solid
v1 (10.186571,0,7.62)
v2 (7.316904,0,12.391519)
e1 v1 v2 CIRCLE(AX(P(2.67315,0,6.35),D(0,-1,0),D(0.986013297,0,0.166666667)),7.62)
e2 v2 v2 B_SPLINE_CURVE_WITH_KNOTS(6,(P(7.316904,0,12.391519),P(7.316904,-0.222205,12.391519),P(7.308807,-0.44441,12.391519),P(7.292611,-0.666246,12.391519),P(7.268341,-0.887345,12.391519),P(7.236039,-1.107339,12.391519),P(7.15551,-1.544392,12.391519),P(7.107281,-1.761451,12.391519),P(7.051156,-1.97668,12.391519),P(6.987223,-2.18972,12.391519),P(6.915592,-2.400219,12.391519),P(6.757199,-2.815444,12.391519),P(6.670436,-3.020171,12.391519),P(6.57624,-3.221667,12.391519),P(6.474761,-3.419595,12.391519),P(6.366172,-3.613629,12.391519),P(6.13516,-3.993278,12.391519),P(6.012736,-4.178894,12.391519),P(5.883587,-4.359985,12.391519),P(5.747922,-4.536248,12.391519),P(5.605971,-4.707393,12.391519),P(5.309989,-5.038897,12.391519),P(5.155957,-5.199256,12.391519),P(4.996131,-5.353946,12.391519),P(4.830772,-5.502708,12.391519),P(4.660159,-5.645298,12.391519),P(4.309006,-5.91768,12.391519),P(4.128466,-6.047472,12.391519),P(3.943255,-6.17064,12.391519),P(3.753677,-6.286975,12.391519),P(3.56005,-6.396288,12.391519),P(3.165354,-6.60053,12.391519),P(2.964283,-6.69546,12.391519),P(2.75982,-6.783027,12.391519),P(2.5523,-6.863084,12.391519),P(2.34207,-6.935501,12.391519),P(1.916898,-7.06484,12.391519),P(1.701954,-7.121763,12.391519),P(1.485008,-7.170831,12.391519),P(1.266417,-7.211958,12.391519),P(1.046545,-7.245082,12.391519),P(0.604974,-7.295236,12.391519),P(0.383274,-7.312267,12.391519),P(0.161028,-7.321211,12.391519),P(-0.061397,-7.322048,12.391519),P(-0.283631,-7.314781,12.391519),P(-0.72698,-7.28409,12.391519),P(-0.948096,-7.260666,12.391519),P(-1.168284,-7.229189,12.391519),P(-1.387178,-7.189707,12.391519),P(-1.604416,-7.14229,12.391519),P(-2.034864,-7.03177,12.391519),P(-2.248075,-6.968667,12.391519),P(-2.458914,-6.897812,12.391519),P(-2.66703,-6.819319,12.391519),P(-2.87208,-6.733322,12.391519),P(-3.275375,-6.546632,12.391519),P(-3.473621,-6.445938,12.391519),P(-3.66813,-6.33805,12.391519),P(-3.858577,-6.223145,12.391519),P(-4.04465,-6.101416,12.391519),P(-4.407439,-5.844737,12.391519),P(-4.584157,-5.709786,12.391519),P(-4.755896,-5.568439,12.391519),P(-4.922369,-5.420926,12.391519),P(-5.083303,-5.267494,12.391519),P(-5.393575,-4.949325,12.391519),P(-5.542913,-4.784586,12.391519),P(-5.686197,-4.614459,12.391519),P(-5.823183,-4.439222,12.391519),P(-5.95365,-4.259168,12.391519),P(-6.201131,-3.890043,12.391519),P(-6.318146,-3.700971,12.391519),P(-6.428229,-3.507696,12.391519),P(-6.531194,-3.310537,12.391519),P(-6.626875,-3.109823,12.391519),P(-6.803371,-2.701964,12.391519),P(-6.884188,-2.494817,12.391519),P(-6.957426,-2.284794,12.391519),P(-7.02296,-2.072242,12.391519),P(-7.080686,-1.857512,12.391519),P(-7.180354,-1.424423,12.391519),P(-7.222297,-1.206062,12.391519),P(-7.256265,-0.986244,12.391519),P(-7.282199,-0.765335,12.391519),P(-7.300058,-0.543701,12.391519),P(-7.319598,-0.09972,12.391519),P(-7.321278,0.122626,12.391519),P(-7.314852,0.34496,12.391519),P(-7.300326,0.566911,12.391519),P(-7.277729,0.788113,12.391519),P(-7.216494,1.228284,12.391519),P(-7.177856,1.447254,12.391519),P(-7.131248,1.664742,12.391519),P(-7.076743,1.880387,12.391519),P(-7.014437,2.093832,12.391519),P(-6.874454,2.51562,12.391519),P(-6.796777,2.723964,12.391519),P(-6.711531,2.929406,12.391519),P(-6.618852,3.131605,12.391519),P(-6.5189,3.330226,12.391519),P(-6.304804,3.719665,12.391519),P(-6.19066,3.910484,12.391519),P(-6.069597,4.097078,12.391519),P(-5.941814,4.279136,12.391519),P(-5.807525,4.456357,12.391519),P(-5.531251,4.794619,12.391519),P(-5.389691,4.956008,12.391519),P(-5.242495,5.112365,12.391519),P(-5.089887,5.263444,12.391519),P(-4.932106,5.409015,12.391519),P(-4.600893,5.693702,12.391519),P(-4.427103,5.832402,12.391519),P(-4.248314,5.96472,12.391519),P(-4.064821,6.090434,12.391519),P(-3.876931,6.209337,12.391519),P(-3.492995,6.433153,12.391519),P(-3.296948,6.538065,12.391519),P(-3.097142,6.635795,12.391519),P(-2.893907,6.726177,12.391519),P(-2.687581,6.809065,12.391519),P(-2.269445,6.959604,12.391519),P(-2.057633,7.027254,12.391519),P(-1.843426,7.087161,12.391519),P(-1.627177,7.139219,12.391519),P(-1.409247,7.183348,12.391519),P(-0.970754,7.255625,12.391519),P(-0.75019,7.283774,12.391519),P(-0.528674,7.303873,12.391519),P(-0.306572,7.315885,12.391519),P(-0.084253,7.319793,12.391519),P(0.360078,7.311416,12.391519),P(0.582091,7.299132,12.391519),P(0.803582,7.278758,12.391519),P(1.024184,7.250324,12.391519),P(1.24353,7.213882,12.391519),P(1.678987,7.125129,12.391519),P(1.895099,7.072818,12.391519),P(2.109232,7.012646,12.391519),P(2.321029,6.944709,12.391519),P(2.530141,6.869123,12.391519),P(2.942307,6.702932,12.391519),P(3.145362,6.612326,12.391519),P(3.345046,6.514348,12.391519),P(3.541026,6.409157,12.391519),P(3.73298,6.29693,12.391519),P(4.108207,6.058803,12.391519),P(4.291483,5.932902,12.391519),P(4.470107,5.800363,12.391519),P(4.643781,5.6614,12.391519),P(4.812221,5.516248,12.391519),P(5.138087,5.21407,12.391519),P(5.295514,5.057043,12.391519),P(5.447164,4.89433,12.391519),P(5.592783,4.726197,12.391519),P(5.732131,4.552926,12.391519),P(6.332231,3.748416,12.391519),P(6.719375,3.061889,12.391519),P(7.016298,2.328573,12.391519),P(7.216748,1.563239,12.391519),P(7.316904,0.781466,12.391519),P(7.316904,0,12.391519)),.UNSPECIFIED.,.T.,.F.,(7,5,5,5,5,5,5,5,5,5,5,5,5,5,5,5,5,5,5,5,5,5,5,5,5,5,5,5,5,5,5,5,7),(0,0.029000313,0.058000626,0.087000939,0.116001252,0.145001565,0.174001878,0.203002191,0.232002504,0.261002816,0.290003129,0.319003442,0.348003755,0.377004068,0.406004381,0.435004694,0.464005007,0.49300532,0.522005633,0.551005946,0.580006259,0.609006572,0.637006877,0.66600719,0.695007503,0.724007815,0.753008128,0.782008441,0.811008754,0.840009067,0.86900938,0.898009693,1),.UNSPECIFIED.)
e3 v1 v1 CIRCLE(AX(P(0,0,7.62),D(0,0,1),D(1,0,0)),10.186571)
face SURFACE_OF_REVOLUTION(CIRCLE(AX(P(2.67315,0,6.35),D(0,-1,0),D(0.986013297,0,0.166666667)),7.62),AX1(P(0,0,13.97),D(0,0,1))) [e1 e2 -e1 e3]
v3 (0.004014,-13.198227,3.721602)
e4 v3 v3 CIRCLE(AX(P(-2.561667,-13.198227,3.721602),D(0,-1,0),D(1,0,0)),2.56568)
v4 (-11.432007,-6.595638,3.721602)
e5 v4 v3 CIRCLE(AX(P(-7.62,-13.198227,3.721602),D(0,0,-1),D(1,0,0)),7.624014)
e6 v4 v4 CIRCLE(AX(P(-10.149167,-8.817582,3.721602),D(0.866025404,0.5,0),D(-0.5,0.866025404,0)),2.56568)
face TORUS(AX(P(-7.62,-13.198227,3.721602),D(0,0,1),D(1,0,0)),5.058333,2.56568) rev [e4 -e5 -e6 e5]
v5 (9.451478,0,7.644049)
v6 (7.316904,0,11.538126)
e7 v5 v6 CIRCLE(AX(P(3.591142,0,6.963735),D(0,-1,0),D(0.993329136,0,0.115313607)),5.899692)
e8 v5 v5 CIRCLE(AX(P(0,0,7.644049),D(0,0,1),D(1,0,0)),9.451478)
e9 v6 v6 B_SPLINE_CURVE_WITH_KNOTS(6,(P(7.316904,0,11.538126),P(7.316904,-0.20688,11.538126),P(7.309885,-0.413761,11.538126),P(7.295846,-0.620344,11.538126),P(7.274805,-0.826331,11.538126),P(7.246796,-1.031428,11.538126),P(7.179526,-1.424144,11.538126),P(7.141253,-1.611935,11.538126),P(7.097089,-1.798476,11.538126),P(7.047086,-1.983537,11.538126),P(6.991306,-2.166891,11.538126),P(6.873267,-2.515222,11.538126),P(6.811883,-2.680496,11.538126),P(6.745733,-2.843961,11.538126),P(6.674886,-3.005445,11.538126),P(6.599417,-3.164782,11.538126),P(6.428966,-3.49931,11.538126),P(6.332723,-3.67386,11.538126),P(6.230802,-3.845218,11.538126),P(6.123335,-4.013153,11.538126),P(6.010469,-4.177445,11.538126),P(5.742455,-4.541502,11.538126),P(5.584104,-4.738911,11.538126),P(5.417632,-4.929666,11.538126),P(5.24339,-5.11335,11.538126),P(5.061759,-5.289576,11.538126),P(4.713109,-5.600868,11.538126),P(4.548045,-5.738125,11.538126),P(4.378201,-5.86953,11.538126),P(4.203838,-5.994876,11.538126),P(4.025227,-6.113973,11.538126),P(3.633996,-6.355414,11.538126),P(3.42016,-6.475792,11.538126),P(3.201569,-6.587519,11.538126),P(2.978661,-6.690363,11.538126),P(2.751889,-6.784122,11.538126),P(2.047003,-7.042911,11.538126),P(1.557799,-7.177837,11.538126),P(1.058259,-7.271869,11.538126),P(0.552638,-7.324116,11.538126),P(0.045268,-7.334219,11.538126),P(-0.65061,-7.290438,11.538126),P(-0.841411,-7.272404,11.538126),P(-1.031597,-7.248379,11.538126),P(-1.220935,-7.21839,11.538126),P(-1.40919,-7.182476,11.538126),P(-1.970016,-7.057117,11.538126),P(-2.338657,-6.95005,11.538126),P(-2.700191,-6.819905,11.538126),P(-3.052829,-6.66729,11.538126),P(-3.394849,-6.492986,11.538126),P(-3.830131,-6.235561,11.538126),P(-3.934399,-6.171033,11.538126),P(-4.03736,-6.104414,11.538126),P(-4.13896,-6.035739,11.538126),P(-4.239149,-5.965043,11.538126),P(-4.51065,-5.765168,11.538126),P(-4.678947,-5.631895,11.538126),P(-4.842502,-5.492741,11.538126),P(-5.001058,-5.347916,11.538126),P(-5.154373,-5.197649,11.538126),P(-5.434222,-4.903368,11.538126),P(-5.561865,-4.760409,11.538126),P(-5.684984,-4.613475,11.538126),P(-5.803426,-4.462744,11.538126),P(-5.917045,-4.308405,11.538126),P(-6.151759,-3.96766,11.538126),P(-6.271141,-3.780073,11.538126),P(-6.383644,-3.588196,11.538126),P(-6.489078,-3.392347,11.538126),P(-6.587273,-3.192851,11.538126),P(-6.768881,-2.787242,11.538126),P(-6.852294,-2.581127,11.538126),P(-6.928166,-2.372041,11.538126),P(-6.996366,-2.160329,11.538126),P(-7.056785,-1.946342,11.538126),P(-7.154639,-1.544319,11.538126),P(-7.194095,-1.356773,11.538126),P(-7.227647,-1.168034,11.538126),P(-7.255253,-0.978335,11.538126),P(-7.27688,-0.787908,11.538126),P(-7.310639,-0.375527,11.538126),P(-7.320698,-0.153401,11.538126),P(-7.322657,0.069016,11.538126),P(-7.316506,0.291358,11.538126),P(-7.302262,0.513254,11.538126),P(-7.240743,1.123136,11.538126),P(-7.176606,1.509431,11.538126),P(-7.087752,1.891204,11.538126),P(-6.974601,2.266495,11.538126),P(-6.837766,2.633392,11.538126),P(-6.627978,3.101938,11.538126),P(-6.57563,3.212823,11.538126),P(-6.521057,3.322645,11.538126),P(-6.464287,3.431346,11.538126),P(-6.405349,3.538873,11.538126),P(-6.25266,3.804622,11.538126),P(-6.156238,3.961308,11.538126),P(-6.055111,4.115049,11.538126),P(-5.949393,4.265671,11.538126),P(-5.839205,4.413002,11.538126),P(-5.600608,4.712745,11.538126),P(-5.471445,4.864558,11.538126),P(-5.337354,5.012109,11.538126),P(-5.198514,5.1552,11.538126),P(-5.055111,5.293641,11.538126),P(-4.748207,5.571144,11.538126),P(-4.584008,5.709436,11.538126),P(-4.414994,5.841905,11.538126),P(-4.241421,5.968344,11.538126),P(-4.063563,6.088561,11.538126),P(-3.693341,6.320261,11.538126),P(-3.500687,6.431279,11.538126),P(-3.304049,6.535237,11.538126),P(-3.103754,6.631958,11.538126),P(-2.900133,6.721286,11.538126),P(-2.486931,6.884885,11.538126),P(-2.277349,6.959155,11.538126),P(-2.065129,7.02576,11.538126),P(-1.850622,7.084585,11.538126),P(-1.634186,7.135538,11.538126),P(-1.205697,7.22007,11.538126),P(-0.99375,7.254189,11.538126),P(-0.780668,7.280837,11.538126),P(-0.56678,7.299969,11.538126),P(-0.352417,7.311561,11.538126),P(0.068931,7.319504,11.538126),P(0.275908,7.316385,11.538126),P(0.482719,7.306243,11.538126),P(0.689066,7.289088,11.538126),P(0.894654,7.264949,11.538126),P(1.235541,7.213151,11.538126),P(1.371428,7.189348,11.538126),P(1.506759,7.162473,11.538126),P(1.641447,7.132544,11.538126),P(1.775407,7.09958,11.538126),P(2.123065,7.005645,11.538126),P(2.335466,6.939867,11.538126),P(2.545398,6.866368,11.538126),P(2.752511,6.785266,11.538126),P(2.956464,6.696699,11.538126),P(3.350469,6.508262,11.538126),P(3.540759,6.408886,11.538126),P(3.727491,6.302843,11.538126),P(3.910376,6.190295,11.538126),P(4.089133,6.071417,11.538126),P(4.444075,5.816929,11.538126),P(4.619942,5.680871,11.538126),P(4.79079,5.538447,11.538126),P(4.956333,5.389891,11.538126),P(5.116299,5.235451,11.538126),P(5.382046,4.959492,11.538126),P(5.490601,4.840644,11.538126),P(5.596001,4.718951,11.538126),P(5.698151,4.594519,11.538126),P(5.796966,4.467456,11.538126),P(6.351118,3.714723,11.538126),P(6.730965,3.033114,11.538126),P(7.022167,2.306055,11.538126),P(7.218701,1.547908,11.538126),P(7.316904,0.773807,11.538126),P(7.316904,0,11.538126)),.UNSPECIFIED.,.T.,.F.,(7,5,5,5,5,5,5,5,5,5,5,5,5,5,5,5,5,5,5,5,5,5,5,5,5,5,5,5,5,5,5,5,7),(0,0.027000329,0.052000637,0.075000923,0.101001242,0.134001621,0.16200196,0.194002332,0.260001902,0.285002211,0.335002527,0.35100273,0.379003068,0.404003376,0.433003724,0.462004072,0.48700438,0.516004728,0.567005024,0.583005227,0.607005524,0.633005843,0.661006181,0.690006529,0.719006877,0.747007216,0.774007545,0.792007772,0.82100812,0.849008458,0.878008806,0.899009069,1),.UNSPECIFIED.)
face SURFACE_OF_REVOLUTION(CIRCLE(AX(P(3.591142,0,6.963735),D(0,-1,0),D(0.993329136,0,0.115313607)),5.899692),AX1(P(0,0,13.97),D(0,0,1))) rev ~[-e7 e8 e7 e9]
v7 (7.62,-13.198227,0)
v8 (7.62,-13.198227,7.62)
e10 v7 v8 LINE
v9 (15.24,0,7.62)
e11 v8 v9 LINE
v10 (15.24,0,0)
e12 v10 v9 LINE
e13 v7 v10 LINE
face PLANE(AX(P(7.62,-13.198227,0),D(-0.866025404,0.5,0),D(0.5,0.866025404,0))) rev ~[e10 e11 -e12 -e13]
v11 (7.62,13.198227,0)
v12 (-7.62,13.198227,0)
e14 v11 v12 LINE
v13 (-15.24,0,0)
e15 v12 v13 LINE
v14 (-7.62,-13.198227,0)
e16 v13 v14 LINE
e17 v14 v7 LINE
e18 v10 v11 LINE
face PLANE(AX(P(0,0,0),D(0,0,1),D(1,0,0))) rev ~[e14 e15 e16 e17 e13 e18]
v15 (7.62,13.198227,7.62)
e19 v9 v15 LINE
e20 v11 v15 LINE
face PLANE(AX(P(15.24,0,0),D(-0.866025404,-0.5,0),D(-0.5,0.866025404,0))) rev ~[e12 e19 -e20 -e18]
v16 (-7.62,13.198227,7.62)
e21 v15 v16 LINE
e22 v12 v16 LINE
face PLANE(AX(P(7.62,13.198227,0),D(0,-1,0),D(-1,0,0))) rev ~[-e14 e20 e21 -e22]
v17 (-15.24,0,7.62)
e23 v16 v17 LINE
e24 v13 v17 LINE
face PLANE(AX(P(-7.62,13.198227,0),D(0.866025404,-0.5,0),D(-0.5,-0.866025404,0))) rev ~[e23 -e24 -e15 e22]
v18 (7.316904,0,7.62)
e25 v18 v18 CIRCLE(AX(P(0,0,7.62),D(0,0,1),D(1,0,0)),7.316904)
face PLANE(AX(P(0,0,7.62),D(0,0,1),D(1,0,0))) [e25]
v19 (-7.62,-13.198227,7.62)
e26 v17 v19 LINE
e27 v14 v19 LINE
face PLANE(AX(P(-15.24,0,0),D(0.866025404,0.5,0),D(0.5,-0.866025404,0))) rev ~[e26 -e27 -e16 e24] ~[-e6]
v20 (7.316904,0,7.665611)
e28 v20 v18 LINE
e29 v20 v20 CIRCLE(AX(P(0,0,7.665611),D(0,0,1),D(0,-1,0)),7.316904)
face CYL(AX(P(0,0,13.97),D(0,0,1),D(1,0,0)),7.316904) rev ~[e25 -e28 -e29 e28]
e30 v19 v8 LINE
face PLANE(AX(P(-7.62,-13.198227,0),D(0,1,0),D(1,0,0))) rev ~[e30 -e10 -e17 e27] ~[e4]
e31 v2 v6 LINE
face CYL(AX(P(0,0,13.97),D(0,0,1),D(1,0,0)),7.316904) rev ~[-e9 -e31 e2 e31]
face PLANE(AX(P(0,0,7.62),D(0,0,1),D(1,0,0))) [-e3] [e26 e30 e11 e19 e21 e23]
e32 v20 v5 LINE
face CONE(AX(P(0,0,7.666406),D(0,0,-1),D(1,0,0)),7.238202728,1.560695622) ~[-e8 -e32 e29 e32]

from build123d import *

# Parameters (mm, degrees)
F1_DEPTH = 7.62
F2_R     = 10.1865714181
F3_DEPTH = 6.35
F5_R     = 7.316904296
F6_DEPTH = 6.35
F9_R     = 2.5656803157


# Not quite as in the source:
# - a fillet or chamfer that OpenCascade refuses, or shapes differently, is made with other operations: its cross-section is extruded or revolved along the edge and cut away or added


with BuildPart() as f1:
    # F0 (on Top) → F1 (new body)
    with BuildSketch(Plane.XY):
        Polygon((7.62, -13.1982271537), (15.24, 0), (7.62, 13.1982271537), (-7.62, 13.1982271537), (-15.24, 0), (-7.62, -13.1982271537), align=None)
    extrude(amount=F1_DEPTH)

    # F2 (on face) → F3 (join)
    with BuildSketch(Plane.XY.offset(7.62)):
        Circle(F2_R)
    extrude(amount=F3_DEPTH)

    # F4: fillet of radius 7.62 on 1 edges, made by hand

    # F4_s1 → F4_t2 (revolve, cut)
    with BuildSketch(Plane.XZ):
        with BuildLine():
            ThreePointArc((10.1865714181, 7.62), (7.5918389432, 12.1698711326), (2.6731500935, 13.97))
            Line((2.6731500935, 13.97), (10.1865714181, 13.97))
            Line((10.1865714181, 13.97), (10.1865714181, 7.62))
        make_face()
    revolve(axis=Axis((0, 0, 13.97), (0, 0, 1)), mode=Mode.SUBTRACT)

    # F5 (on face) → F6 (cut, through all)
    with BuildSketch(Plane.XY.offset(13.97)):
        Circle(F5_R)
    extrude(amount=-F6_DEPTH, mode=Mode.SUBTRACT)

    # F7 (on Front) → F8 (revolve, cut)
    with BuildSketch(Plane.XZ):
        with BuildLine():
            Line((7.2382027283, 7.666405756), (9.4514777884, 7.6440493576))
            ThreePointArc((9.4514777884, 7.6440493576), (8.7401460246, 9.8436861794), (7.2382027283, 11.6011165082))
            Line((7.2382027283, 11.6011165082), (7.2382027283, 7.666405756))
        make_face()
    revolve(axis=Axis((0, 0, 13.97), (0, 0, 1)), mode=Mode.SUBTRACT)

    # F9 (on face) → F10 (revolve, cut)
    with BuildSketch(Plane.XZ.offset(13.1982271537)):
        with Locations((-2.5616665371, 3.7216017954)):
            Circle(F9_R)
    revolve(axis=Axis((-7.62, -13.1982271537, 3.81), (0, 0, -1)), mode=Mode.SUBTRACT)


solid = f1.part
